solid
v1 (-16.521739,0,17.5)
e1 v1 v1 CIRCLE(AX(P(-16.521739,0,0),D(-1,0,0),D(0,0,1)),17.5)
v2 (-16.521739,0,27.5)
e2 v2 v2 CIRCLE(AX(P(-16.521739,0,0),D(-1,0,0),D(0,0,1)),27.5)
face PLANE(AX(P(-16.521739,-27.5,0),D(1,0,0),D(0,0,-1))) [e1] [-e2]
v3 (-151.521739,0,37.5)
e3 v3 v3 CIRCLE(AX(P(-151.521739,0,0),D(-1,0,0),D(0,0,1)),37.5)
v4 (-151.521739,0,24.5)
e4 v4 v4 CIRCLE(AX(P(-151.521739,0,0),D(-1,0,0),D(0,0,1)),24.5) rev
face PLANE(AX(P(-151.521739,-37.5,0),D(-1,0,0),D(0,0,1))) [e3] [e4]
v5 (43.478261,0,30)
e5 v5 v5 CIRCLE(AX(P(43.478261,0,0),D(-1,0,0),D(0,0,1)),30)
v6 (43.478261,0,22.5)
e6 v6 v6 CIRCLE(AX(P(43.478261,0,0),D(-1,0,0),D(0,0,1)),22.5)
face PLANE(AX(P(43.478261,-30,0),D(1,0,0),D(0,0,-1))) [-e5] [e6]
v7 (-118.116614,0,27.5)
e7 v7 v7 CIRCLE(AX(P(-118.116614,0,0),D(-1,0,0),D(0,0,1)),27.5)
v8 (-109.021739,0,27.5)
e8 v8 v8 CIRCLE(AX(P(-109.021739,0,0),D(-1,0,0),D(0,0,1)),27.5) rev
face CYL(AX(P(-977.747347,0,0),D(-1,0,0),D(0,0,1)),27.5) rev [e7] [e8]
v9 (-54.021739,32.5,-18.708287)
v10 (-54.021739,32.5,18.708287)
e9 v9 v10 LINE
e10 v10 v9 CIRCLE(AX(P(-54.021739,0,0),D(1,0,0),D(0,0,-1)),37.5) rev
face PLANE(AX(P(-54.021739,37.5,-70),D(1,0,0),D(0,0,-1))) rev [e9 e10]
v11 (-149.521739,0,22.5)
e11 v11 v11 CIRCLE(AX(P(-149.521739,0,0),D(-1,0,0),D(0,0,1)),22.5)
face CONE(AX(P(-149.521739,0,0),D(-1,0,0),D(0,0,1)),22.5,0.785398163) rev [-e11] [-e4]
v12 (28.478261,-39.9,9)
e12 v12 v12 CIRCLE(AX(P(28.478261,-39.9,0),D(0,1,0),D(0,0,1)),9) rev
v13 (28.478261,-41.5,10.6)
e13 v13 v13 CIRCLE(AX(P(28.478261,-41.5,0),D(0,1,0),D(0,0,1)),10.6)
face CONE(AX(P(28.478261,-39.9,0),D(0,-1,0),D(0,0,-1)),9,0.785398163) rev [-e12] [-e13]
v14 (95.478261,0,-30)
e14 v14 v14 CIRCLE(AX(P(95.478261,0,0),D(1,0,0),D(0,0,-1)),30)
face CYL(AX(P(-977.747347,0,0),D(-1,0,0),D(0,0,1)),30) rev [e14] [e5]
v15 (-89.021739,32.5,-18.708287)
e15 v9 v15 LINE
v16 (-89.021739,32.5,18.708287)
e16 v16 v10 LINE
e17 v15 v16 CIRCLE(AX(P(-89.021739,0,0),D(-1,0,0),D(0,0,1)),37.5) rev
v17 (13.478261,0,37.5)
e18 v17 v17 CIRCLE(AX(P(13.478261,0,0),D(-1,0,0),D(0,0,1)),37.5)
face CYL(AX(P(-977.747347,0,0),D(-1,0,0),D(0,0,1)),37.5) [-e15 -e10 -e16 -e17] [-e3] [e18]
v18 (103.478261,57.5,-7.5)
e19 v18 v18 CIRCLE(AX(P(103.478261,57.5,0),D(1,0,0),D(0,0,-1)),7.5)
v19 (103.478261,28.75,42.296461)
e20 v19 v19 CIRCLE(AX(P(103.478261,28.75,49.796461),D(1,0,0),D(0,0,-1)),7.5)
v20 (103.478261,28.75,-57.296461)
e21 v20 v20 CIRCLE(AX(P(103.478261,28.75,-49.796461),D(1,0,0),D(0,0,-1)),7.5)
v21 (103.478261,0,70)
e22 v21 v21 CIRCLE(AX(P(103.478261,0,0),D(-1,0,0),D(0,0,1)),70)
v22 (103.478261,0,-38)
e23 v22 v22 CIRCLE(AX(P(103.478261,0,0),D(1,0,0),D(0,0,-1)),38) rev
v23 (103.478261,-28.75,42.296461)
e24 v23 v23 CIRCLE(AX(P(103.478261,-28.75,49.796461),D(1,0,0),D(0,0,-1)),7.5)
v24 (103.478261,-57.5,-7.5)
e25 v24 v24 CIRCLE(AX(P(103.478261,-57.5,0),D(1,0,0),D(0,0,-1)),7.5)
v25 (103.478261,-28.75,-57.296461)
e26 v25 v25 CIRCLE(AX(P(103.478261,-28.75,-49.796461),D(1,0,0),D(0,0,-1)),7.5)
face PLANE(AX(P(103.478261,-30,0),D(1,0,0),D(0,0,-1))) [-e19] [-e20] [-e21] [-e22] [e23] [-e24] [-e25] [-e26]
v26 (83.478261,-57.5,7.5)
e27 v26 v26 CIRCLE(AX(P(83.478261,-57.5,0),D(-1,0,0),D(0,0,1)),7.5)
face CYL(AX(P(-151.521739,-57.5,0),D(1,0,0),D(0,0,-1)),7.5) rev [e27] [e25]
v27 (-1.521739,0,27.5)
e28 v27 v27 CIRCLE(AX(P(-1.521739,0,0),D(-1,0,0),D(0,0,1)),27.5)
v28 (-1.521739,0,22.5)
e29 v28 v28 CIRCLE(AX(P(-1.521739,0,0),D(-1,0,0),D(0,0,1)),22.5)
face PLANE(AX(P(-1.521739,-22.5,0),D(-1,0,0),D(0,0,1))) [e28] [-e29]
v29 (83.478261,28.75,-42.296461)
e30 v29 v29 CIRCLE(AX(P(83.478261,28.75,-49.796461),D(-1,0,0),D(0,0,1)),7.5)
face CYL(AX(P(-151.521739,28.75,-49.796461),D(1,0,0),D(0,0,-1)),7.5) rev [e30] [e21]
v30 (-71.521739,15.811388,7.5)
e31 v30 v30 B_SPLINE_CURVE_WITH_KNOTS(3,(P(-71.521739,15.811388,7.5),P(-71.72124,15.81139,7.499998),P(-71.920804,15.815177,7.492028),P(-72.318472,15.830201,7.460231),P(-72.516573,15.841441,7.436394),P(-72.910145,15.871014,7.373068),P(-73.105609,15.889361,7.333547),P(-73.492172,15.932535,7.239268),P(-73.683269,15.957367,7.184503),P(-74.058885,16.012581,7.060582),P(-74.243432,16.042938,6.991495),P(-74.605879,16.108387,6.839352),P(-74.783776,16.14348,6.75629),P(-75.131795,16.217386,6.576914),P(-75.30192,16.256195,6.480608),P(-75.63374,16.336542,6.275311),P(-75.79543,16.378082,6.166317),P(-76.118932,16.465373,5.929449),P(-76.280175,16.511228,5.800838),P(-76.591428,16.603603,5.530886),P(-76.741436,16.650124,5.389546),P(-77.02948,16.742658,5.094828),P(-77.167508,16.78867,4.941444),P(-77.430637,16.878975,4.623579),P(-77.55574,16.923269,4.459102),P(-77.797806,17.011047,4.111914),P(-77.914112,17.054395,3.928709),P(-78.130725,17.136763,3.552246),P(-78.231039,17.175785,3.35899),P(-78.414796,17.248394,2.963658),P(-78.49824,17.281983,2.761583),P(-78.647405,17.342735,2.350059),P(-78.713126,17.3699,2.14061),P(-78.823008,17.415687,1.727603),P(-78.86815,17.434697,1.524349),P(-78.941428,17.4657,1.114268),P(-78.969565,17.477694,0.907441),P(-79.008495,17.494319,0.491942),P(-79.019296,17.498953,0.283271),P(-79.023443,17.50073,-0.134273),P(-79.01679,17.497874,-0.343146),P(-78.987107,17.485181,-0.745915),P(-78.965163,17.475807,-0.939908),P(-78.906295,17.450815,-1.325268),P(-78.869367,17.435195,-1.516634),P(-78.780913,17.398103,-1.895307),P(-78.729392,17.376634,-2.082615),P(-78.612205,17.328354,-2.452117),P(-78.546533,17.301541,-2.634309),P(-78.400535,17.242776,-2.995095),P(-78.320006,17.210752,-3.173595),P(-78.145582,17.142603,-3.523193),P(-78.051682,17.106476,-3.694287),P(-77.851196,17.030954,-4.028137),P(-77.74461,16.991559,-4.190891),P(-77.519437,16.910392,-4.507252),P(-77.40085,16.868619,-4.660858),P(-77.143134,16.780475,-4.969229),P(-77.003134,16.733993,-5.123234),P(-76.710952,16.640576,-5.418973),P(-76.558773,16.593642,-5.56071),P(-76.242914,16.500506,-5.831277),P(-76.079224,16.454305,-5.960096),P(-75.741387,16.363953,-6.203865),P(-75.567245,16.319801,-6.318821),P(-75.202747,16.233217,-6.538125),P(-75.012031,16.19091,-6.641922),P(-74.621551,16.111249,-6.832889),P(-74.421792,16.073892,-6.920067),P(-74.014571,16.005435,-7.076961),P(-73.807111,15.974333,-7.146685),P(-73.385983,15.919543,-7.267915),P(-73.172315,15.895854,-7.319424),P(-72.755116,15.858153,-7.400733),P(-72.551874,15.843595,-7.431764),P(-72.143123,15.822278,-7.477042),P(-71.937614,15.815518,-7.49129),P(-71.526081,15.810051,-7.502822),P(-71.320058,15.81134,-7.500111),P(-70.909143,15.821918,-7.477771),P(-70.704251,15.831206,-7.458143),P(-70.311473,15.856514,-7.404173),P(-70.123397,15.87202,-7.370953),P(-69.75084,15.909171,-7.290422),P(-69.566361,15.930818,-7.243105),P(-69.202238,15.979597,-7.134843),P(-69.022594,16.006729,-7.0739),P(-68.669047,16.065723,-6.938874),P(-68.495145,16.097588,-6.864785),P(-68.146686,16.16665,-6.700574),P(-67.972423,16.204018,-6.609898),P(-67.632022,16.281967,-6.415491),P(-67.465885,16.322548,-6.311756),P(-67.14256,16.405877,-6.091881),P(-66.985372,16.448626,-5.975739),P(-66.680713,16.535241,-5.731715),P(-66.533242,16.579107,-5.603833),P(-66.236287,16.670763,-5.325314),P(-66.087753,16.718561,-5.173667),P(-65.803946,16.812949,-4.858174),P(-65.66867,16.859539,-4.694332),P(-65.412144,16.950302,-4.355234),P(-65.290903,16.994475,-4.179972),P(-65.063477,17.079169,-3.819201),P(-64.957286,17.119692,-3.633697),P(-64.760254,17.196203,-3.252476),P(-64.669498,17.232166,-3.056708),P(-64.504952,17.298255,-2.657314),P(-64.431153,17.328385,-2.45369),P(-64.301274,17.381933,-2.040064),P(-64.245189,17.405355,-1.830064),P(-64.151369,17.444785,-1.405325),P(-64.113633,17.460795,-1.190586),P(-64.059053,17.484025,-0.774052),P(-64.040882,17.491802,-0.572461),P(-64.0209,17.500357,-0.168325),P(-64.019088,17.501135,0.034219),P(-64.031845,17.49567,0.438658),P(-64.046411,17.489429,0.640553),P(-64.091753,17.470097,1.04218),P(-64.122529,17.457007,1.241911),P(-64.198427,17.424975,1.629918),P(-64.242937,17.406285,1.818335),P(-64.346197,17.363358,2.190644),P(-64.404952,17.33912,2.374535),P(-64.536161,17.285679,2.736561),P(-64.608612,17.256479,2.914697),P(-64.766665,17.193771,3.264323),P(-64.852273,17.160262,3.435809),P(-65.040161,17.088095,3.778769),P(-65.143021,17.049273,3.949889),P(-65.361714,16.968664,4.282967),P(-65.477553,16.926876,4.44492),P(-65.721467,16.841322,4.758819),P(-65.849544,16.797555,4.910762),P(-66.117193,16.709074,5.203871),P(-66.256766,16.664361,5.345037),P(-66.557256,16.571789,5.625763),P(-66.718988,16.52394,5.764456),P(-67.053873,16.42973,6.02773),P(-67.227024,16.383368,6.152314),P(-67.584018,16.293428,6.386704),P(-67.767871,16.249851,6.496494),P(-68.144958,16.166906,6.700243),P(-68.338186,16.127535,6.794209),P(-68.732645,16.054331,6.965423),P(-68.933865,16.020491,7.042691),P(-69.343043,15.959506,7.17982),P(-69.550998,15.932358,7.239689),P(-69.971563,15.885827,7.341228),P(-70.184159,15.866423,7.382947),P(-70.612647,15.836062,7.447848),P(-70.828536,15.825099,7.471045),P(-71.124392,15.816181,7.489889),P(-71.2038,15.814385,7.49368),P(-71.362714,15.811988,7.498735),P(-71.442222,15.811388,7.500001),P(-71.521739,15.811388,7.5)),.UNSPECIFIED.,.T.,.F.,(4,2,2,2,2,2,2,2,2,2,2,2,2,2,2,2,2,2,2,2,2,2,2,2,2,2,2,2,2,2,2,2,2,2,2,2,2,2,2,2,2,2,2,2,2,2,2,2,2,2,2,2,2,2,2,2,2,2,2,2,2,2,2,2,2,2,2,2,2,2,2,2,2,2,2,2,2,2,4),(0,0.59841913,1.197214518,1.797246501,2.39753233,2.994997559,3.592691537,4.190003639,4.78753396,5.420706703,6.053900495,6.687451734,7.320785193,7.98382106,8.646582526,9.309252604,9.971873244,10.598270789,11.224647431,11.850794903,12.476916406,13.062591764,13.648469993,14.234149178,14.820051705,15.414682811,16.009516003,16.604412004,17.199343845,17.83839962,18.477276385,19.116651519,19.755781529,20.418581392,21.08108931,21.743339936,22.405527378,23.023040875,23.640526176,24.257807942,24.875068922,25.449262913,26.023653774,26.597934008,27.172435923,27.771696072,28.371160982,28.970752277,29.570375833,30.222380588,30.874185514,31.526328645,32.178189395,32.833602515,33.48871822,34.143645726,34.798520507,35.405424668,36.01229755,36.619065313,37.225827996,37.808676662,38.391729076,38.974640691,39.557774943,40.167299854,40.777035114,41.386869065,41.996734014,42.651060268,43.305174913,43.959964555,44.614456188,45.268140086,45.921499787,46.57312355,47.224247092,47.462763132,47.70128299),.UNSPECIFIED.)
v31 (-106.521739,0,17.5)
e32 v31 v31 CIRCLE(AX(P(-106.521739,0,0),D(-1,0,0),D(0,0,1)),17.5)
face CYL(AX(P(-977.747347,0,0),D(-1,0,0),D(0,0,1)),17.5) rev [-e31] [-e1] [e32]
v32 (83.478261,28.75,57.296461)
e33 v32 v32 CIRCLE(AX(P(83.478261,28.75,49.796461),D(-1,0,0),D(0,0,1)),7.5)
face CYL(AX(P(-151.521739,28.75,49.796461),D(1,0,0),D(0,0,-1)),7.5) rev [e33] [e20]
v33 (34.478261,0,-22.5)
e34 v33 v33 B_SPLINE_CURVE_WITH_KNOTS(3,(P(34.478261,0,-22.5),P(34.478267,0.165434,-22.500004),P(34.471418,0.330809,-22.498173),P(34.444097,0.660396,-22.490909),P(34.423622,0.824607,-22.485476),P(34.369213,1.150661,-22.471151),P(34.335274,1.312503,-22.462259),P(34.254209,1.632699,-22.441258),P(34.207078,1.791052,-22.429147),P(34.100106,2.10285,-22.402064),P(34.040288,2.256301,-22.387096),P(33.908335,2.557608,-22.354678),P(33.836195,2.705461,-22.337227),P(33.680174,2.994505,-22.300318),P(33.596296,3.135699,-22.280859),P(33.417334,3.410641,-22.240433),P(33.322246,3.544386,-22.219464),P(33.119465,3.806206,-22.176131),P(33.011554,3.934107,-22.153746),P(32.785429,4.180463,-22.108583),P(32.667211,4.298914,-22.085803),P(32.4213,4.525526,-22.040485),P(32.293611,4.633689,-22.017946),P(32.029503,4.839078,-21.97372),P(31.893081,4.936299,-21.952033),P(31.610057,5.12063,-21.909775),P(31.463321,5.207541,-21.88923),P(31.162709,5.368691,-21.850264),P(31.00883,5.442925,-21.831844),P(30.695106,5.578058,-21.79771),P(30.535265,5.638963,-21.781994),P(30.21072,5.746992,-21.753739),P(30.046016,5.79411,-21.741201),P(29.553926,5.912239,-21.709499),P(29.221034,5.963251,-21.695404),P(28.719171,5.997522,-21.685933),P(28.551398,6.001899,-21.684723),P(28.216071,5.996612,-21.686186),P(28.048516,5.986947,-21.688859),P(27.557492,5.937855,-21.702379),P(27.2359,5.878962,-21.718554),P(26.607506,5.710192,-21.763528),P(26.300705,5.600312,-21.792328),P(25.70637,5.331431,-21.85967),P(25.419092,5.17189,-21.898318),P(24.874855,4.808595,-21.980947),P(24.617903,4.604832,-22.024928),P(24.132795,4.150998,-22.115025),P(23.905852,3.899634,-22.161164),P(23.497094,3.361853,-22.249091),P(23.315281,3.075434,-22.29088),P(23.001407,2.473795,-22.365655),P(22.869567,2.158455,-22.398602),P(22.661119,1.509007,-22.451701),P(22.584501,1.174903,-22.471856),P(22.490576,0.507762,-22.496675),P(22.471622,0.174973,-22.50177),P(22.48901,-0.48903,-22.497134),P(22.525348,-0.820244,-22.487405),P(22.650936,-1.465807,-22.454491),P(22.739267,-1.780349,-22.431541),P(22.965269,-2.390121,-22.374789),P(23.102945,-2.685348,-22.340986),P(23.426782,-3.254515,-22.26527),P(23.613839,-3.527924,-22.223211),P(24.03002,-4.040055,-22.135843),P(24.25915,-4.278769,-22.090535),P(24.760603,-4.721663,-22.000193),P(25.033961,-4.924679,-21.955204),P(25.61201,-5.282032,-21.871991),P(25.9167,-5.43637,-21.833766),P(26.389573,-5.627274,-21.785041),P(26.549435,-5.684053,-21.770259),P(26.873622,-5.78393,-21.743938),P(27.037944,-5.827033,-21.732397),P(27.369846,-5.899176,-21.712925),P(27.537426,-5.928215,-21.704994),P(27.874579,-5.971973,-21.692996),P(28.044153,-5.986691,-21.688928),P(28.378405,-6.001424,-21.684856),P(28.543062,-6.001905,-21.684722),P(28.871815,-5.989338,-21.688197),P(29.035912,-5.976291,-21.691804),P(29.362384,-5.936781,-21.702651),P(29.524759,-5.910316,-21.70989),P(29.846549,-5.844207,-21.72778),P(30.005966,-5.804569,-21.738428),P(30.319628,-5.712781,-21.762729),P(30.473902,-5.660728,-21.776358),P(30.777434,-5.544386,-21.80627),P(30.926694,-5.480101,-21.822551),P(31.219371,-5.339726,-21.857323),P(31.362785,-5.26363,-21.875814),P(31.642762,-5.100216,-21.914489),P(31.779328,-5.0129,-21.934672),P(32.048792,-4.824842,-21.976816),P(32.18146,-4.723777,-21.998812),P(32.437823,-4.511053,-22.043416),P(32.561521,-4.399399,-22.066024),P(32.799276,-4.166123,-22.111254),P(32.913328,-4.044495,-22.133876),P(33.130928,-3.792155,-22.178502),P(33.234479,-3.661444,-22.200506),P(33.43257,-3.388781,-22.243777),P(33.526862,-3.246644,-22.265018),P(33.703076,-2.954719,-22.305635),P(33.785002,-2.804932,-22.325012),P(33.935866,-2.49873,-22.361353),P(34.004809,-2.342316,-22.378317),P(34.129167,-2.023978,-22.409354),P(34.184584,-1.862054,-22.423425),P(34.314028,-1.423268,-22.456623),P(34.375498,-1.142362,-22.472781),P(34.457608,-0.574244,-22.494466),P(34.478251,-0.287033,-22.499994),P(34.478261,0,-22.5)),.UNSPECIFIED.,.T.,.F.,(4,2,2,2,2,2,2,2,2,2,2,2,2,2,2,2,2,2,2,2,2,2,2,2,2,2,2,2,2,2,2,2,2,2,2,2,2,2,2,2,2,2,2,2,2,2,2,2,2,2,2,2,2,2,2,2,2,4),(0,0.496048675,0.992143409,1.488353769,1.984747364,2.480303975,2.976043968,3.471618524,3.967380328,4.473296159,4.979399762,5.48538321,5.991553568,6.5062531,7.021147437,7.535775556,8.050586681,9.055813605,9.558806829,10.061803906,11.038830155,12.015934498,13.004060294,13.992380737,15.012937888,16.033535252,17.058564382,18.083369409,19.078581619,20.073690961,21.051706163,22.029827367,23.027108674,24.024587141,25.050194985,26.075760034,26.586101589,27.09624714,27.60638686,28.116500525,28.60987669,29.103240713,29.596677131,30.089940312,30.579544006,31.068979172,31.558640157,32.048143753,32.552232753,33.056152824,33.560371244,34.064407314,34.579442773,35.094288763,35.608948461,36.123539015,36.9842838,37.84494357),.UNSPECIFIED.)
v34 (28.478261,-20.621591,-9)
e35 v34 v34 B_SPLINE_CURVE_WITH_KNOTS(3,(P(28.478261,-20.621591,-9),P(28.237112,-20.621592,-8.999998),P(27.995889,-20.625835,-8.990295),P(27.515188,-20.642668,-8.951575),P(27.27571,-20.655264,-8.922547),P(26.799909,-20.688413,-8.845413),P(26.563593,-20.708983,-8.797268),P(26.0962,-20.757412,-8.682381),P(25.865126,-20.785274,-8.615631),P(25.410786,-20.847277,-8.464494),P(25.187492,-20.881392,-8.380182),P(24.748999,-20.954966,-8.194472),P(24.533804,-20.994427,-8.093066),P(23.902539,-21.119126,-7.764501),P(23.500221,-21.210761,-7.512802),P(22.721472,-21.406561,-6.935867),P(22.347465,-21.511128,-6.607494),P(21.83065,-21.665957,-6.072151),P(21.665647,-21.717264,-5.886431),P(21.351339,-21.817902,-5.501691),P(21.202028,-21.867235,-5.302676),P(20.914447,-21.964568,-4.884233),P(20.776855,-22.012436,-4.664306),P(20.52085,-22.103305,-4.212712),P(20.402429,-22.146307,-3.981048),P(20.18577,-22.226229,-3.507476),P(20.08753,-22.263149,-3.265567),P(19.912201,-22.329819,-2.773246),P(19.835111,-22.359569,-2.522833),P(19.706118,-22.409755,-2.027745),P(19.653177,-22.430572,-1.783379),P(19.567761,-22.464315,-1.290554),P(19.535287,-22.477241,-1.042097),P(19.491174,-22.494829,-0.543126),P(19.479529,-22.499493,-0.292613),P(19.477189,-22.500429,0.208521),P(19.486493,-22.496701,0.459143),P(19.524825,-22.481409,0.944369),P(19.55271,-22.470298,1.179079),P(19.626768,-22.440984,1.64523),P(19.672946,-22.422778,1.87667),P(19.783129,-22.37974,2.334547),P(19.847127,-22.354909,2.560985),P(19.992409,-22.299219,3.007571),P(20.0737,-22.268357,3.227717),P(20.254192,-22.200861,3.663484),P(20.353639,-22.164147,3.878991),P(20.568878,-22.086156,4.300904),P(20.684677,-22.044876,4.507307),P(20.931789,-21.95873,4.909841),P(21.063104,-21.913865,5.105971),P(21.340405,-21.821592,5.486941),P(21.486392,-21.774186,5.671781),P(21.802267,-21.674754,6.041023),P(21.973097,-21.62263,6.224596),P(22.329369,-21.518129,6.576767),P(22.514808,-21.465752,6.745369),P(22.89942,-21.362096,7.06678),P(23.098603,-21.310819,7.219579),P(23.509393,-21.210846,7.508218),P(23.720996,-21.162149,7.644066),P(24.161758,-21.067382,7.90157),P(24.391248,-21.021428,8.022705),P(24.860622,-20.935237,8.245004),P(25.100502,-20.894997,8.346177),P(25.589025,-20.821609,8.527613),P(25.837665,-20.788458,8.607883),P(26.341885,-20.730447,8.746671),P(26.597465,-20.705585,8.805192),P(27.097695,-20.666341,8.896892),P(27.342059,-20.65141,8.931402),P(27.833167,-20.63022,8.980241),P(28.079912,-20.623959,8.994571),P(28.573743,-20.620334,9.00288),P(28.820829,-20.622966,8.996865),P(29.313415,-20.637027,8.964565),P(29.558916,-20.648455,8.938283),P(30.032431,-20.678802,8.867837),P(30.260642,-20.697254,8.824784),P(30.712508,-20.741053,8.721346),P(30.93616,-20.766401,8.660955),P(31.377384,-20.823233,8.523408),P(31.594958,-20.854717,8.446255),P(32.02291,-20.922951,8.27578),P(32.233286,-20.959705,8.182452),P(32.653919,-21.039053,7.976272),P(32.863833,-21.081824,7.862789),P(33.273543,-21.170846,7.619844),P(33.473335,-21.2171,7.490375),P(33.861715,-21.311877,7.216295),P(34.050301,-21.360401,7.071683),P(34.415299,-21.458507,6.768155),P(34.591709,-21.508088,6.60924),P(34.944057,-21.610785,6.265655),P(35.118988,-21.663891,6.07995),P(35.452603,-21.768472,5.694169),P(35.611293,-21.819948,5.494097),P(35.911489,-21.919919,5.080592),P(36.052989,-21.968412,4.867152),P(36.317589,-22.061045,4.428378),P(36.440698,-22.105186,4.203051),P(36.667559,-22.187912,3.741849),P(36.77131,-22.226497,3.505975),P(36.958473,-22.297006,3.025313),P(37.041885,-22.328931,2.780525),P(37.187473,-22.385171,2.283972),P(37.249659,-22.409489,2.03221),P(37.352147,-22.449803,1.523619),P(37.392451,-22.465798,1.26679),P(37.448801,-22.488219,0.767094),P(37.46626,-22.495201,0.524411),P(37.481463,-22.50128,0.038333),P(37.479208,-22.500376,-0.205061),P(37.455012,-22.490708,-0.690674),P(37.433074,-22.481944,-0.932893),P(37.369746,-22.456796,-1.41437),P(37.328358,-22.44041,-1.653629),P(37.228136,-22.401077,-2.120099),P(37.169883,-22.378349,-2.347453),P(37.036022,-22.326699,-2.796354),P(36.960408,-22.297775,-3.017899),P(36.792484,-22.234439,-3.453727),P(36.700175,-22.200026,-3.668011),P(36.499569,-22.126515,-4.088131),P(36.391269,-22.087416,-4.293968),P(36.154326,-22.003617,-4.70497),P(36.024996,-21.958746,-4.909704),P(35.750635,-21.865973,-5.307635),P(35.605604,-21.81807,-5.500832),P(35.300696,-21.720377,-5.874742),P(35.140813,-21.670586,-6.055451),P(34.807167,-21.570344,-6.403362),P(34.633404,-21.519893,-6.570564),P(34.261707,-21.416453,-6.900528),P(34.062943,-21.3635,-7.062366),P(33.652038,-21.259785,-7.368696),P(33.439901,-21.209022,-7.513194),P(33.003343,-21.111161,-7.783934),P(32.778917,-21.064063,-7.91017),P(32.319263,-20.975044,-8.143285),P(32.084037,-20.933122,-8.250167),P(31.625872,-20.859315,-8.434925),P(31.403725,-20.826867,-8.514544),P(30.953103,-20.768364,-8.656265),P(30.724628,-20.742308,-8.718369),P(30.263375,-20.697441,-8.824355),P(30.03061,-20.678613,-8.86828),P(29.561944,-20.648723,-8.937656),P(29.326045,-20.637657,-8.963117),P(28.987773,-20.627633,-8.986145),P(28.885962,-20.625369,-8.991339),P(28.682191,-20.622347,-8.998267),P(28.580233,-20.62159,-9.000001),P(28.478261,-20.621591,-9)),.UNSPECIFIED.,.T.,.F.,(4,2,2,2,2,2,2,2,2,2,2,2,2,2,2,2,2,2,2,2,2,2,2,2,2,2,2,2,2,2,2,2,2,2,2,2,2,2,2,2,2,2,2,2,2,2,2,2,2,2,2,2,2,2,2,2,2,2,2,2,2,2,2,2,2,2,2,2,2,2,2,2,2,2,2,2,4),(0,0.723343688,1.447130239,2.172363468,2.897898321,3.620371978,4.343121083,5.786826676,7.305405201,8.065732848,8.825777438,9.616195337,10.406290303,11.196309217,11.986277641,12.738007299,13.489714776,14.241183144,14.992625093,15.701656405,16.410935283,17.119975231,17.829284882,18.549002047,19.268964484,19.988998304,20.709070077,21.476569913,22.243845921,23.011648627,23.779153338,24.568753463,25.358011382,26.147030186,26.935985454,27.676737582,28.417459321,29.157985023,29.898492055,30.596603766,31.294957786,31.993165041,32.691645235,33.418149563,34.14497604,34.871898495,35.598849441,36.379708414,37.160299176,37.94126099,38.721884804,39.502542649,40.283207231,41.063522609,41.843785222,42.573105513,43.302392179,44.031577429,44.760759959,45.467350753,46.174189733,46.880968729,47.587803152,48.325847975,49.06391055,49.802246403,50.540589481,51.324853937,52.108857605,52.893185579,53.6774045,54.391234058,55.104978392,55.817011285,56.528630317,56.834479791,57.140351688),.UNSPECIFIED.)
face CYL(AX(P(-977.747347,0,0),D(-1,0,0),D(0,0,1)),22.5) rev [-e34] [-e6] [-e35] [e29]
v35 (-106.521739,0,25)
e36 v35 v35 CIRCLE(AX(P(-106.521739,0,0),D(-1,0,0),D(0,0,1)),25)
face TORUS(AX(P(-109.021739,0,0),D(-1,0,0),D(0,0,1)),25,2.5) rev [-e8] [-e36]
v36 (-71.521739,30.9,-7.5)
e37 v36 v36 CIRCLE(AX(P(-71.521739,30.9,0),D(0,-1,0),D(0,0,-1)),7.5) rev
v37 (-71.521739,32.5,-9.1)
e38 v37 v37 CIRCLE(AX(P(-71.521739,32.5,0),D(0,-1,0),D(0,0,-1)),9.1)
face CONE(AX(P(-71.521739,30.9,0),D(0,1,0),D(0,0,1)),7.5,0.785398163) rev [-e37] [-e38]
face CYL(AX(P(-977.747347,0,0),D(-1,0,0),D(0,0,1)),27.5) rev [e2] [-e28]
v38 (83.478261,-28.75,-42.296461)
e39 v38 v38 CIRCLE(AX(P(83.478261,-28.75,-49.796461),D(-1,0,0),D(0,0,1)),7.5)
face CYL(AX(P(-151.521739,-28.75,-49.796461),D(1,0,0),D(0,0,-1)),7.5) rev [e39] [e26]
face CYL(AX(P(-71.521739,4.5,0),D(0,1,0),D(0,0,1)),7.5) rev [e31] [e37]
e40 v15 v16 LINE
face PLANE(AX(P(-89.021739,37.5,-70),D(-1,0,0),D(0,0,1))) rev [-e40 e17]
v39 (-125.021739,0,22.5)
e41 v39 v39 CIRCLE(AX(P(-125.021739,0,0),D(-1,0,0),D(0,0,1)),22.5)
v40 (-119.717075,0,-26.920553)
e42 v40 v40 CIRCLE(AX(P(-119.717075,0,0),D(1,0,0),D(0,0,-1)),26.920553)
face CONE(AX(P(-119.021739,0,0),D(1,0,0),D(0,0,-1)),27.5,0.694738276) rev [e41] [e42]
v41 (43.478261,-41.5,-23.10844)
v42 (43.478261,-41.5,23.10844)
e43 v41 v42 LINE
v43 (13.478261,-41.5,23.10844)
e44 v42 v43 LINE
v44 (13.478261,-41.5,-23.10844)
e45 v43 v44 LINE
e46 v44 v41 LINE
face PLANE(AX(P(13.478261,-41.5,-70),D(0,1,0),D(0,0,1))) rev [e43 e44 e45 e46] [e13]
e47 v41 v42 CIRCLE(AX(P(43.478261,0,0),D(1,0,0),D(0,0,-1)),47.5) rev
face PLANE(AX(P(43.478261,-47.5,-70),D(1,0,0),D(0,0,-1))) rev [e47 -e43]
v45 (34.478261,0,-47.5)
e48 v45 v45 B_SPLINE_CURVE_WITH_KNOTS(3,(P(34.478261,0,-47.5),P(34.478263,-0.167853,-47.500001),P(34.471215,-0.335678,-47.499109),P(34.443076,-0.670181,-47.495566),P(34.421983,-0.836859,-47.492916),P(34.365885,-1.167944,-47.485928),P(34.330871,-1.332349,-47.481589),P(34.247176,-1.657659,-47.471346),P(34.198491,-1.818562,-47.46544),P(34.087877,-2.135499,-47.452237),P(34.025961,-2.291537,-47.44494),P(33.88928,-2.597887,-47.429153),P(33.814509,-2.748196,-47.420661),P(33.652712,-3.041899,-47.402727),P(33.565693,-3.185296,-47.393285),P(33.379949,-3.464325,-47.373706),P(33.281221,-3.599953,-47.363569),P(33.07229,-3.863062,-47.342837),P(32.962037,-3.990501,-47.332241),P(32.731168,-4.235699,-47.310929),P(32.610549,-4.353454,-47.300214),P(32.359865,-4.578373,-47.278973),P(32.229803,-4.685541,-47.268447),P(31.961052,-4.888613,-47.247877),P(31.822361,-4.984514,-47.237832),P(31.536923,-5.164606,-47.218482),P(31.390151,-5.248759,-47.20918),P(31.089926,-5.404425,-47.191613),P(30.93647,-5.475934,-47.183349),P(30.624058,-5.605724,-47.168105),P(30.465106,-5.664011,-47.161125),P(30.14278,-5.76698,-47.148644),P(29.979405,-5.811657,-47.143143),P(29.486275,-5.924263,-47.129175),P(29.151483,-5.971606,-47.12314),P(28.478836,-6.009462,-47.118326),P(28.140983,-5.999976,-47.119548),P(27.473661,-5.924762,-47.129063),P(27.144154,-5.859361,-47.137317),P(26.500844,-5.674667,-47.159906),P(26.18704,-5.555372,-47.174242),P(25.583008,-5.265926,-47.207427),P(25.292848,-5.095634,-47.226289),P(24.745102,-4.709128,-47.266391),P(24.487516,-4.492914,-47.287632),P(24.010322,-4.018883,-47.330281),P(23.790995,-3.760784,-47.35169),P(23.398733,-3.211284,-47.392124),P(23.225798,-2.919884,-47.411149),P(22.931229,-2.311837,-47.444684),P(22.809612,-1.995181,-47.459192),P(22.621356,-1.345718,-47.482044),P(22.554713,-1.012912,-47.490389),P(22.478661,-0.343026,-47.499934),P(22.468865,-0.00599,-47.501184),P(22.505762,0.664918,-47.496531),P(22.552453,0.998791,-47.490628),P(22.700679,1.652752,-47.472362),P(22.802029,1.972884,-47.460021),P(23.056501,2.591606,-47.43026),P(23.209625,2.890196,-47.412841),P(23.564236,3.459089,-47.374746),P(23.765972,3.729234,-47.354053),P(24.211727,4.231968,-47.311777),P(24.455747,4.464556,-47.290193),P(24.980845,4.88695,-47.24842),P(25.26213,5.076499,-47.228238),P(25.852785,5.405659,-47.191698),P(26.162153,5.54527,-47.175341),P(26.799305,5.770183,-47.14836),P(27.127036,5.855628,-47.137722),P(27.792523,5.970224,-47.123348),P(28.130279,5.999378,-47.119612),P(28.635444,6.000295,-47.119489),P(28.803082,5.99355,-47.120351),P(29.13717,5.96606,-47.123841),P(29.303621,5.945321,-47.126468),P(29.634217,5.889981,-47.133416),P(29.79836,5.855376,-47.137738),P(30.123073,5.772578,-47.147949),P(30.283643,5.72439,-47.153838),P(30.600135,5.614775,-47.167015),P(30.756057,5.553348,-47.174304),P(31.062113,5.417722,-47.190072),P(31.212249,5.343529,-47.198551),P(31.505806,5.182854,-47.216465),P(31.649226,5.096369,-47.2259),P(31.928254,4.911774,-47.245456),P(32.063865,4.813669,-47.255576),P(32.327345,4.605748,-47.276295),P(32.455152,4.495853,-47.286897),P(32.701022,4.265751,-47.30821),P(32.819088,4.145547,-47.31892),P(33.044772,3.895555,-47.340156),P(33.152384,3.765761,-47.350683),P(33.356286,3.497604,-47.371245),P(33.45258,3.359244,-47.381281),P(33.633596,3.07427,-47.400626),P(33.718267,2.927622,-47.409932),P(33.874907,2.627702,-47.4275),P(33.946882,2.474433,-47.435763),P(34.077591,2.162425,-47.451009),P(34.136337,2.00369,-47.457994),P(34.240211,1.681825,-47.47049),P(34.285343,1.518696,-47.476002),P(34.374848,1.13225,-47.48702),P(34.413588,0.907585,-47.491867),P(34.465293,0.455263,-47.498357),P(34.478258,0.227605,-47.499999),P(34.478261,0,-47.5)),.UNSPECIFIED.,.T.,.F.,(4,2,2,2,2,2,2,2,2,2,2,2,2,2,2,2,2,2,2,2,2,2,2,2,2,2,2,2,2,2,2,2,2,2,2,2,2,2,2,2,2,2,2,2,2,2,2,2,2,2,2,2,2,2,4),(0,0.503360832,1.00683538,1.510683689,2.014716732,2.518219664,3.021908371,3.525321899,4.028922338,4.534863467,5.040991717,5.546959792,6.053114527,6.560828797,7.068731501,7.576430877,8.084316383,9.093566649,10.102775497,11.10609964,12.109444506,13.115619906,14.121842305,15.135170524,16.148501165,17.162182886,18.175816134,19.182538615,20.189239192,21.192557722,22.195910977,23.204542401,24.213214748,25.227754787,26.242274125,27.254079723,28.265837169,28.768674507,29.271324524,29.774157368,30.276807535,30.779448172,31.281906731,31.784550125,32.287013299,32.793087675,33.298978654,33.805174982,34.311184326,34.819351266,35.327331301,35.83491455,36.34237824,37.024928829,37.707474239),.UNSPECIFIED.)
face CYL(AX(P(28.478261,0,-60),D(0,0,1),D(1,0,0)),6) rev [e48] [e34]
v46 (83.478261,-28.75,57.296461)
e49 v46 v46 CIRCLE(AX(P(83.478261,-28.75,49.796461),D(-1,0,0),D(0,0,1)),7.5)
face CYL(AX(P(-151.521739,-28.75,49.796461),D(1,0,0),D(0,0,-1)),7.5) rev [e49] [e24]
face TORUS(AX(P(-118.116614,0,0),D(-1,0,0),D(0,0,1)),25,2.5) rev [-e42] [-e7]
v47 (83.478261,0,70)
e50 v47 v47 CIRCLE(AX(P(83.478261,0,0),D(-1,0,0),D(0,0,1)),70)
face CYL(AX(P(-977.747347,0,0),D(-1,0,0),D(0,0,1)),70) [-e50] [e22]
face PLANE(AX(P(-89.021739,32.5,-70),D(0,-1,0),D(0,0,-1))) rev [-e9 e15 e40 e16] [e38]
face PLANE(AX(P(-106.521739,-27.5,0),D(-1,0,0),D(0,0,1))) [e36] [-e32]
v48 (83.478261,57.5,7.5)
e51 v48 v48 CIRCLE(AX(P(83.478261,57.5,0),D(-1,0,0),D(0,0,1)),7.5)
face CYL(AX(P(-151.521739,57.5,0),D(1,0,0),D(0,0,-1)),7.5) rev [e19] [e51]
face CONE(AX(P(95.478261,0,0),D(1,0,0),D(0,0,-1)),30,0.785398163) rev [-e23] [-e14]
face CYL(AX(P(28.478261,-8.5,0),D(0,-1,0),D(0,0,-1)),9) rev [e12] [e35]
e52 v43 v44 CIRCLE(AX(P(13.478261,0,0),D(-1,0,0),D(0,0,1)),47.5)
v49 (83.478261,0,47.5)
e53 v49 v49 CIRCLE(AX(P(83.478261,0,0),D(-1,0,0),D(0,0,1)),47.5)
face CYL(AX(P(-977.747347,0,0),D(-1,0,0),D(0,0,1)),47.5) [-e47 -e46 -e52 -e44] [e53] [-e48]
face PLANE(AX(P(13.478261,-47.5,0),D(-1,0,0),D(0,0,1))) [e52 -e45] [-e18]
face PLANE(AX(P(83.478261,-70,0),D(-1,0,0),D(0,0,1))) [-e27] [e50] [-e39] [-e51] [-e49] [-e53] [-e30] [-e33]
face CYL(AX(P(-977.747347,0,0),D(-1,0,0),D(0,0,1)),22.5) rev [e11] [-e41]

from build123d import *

# Parameters (mm, degrees)
FILLET2_R               = 2.5
CHAMFER3_SIZE           = 2
CHAMFER4_SIZE           = 8
SKETCH3_R               = 7.5
CUT_EXTRUDE1_DEPTH      = 274.541587332
CUT_EXTRUDE2_DEPTH      = 181.994025949
CUT_EXTRUDE2_DEPTH_BACK = 181.994025949
SKETCH4_W               = 35
SKETCH4_H               = 5
CUT_EXTRUDE3_DEPTH      = 181.994025949
CUT_EXTRUDE3_DEPTH_BACK = 181.994025949
SKETCH5_W               = 30
SKETCH5_H               = 6
SKETCH6_R               = 7.5
CUT_EXTRUDE4_DEPTH      = 28
CHAMFER5_SIZE           = 1.6
SKETCH7_R               = 9
CUT_EXTRUDE5_DEPTH      = 33
CHAMFER6_SIZE           = 1.6
SKETCH8_R               = 6
CUT_EXTRUDE6_DEPTH      = 60


with BuildPart() as part:
    # Sketch1 → Revolve1 (revolve)
    with BuildSketch(Plane.XY):
        Polygon((103.47826087, -30), (103.47826087, -70), (83.47826087, -70), (83.47826087, -47.5), (13.47826087, -47.5), (13.47826087, -37.5), (-151.52173913, -37.5), (-151.52173913, -22.5), (-125.02173913, -22.5), (-119.02173913, -27.5), (-106.52173913, -27.5), (-106.52173913, -17.5), (-16.52173913, -17.5), (-16.52173913, -27.5), (-1.52173913, -27.5), (-1.52173913, -22.5), (43.47826087, -22.5), (43.47826087, -30), align=None)
    revolve(axis=Axis((-977.747346799, 0, 0), (1, 0, 0)))

    # Fillet2
    fillet2_edges = [part.edges().sort_by_distance(p)[0] for p in [
        (-106.52173913, 27.5, 0),
        (-119.02173913, 27.5, 0),
    ]]
    fillet(fillet2_edges, radius=FILLET2_R)

    # Chamfer3
    chamfer3_edges = [part.edges().sort_by_distance(p)[0] for p in [
        (-151.52173913, 22.5, 0),
    ]]
    chamfer(chamfer3_edges, length=CHAMFER3_SIZE)

    # Chamfer4
    chamfer4_edges = [part.edges().sort_by_distance(p)[0] for p in [
        (103.47826087, 30, 0),
    ]]
    chamfer(chamfer4_edges, length=CHAMFER4_SIZE)

    # Sketch3 → Cut-Extrude1 (cut, through all)
    with BuildSketch(Plane(origin=(103.47826087, 0, 0), x_dir=(0, 0, -1), z_dir=(1, 0, 0))):
        with Locations((0, 57.5)):
            Circle(SKETCH3_R)
        with Locations((49.796460718, 28.75)):
            Circle(SKETCH3_R)
        with Locations((49.796460718, -28.75)):
            Circle(SKETCH3_R)
        with Locations((0, -57.5)):
            Circle(SKETCH3_R)
        with Locations((-49.796460718, -28.75)):
            Circle(SKETCH3_R)
        with Locations((-49.796460718, 28.75)):
            Circle(SKETCH3_R)
    extrude(amount=-CUT_EXTRUDE1_DEPTH, mode=Mode.SUBTRACT)

    # Sketch4 → Cut-Extrude2 (cut, two sides: drawn at the far end of the back side and taken through both)
    with BuildSketch(Plane.XY.offset(-CUT_EXTRUDE2_DEPTH_BACK)):
        with Locations((-71.52173913, 35)):
            Rectangle(SKETCH4_W, SKETCH4_H)
    extrude(amount=CUT_EXTRUDE2_DEPTH + CUT_EXTRUDE2_DEPTH_BACK, mode=Mode.SUBTRACT)

    # Sketch5 → Cut-Extrude3 (cut, two sides: drawn at the far end of the back side and taken through both)
    with BuildSketch(Plane.XY.offset(-CUT_EXTRUDE3_DEPTH_BACK)):
        with Locations((28.47826087, -44.5)):
            Rectangle(SKETCH5_W, SKETCH5_H)
    extrude(amount=CUT_EXTRUDE3_DEPTH + CUT_EXTRUDE3_DEPTH_BACK, mode=Mode.SUBTRACT)

    # Sketch6 → Cut-Extrude4 (cut)
    with BuildSketch(Plane(origin=(0, 32.5, 0), x_dir=(1, 0, 0), z_dir=(0, 1, 0))):
        with Locations((-71.52173913, 0)):
            Circle(SKETCH6_R)
    extrude(amount=-CUT_EXTRUDE4_DEPTH, mode=Mode.SUBTRACT)

    # Chamfer5
    chamfer5_edges = [part.edges().sort_by_distance(p)[0] for p in [
        (-79.02173913, 32.5, 0),
    ]]
    chamfer(chamfer5_edges, length=CHAMFER5_SIZE)

    # Sketch7 → Cut-Extrude5 (cut)
    with BuildSketch(Plane.XZ.offset(41.5)):
        with Locations((28.47826087, 0)):
            Circle(SKETCH7_R)
    extrude(amount=-CUT_EXTRUDE5_DEPTH, mode=Mode.SUBTRACT)

    # Chamfer6
    chamfer6_edges = [part.edges().sort_by_distance(p)[0] for p in [
        (19.47826087, -41.5, 0),
    ]]
    chamfer(chamfer6_edges, length=CHAMFER6_SIZE)

    # Sketch8 → Cut-Extrude6 (cut)
    with BuildSketch(Plane.XY):
        with Locations((28.47826087, 0)):
            Circle(SKETCH8_R)
    extrude(amount=-CUT_EXTRUDE6_DEPTH, mode=Mode.SUBTRACT)


solid = part.part
